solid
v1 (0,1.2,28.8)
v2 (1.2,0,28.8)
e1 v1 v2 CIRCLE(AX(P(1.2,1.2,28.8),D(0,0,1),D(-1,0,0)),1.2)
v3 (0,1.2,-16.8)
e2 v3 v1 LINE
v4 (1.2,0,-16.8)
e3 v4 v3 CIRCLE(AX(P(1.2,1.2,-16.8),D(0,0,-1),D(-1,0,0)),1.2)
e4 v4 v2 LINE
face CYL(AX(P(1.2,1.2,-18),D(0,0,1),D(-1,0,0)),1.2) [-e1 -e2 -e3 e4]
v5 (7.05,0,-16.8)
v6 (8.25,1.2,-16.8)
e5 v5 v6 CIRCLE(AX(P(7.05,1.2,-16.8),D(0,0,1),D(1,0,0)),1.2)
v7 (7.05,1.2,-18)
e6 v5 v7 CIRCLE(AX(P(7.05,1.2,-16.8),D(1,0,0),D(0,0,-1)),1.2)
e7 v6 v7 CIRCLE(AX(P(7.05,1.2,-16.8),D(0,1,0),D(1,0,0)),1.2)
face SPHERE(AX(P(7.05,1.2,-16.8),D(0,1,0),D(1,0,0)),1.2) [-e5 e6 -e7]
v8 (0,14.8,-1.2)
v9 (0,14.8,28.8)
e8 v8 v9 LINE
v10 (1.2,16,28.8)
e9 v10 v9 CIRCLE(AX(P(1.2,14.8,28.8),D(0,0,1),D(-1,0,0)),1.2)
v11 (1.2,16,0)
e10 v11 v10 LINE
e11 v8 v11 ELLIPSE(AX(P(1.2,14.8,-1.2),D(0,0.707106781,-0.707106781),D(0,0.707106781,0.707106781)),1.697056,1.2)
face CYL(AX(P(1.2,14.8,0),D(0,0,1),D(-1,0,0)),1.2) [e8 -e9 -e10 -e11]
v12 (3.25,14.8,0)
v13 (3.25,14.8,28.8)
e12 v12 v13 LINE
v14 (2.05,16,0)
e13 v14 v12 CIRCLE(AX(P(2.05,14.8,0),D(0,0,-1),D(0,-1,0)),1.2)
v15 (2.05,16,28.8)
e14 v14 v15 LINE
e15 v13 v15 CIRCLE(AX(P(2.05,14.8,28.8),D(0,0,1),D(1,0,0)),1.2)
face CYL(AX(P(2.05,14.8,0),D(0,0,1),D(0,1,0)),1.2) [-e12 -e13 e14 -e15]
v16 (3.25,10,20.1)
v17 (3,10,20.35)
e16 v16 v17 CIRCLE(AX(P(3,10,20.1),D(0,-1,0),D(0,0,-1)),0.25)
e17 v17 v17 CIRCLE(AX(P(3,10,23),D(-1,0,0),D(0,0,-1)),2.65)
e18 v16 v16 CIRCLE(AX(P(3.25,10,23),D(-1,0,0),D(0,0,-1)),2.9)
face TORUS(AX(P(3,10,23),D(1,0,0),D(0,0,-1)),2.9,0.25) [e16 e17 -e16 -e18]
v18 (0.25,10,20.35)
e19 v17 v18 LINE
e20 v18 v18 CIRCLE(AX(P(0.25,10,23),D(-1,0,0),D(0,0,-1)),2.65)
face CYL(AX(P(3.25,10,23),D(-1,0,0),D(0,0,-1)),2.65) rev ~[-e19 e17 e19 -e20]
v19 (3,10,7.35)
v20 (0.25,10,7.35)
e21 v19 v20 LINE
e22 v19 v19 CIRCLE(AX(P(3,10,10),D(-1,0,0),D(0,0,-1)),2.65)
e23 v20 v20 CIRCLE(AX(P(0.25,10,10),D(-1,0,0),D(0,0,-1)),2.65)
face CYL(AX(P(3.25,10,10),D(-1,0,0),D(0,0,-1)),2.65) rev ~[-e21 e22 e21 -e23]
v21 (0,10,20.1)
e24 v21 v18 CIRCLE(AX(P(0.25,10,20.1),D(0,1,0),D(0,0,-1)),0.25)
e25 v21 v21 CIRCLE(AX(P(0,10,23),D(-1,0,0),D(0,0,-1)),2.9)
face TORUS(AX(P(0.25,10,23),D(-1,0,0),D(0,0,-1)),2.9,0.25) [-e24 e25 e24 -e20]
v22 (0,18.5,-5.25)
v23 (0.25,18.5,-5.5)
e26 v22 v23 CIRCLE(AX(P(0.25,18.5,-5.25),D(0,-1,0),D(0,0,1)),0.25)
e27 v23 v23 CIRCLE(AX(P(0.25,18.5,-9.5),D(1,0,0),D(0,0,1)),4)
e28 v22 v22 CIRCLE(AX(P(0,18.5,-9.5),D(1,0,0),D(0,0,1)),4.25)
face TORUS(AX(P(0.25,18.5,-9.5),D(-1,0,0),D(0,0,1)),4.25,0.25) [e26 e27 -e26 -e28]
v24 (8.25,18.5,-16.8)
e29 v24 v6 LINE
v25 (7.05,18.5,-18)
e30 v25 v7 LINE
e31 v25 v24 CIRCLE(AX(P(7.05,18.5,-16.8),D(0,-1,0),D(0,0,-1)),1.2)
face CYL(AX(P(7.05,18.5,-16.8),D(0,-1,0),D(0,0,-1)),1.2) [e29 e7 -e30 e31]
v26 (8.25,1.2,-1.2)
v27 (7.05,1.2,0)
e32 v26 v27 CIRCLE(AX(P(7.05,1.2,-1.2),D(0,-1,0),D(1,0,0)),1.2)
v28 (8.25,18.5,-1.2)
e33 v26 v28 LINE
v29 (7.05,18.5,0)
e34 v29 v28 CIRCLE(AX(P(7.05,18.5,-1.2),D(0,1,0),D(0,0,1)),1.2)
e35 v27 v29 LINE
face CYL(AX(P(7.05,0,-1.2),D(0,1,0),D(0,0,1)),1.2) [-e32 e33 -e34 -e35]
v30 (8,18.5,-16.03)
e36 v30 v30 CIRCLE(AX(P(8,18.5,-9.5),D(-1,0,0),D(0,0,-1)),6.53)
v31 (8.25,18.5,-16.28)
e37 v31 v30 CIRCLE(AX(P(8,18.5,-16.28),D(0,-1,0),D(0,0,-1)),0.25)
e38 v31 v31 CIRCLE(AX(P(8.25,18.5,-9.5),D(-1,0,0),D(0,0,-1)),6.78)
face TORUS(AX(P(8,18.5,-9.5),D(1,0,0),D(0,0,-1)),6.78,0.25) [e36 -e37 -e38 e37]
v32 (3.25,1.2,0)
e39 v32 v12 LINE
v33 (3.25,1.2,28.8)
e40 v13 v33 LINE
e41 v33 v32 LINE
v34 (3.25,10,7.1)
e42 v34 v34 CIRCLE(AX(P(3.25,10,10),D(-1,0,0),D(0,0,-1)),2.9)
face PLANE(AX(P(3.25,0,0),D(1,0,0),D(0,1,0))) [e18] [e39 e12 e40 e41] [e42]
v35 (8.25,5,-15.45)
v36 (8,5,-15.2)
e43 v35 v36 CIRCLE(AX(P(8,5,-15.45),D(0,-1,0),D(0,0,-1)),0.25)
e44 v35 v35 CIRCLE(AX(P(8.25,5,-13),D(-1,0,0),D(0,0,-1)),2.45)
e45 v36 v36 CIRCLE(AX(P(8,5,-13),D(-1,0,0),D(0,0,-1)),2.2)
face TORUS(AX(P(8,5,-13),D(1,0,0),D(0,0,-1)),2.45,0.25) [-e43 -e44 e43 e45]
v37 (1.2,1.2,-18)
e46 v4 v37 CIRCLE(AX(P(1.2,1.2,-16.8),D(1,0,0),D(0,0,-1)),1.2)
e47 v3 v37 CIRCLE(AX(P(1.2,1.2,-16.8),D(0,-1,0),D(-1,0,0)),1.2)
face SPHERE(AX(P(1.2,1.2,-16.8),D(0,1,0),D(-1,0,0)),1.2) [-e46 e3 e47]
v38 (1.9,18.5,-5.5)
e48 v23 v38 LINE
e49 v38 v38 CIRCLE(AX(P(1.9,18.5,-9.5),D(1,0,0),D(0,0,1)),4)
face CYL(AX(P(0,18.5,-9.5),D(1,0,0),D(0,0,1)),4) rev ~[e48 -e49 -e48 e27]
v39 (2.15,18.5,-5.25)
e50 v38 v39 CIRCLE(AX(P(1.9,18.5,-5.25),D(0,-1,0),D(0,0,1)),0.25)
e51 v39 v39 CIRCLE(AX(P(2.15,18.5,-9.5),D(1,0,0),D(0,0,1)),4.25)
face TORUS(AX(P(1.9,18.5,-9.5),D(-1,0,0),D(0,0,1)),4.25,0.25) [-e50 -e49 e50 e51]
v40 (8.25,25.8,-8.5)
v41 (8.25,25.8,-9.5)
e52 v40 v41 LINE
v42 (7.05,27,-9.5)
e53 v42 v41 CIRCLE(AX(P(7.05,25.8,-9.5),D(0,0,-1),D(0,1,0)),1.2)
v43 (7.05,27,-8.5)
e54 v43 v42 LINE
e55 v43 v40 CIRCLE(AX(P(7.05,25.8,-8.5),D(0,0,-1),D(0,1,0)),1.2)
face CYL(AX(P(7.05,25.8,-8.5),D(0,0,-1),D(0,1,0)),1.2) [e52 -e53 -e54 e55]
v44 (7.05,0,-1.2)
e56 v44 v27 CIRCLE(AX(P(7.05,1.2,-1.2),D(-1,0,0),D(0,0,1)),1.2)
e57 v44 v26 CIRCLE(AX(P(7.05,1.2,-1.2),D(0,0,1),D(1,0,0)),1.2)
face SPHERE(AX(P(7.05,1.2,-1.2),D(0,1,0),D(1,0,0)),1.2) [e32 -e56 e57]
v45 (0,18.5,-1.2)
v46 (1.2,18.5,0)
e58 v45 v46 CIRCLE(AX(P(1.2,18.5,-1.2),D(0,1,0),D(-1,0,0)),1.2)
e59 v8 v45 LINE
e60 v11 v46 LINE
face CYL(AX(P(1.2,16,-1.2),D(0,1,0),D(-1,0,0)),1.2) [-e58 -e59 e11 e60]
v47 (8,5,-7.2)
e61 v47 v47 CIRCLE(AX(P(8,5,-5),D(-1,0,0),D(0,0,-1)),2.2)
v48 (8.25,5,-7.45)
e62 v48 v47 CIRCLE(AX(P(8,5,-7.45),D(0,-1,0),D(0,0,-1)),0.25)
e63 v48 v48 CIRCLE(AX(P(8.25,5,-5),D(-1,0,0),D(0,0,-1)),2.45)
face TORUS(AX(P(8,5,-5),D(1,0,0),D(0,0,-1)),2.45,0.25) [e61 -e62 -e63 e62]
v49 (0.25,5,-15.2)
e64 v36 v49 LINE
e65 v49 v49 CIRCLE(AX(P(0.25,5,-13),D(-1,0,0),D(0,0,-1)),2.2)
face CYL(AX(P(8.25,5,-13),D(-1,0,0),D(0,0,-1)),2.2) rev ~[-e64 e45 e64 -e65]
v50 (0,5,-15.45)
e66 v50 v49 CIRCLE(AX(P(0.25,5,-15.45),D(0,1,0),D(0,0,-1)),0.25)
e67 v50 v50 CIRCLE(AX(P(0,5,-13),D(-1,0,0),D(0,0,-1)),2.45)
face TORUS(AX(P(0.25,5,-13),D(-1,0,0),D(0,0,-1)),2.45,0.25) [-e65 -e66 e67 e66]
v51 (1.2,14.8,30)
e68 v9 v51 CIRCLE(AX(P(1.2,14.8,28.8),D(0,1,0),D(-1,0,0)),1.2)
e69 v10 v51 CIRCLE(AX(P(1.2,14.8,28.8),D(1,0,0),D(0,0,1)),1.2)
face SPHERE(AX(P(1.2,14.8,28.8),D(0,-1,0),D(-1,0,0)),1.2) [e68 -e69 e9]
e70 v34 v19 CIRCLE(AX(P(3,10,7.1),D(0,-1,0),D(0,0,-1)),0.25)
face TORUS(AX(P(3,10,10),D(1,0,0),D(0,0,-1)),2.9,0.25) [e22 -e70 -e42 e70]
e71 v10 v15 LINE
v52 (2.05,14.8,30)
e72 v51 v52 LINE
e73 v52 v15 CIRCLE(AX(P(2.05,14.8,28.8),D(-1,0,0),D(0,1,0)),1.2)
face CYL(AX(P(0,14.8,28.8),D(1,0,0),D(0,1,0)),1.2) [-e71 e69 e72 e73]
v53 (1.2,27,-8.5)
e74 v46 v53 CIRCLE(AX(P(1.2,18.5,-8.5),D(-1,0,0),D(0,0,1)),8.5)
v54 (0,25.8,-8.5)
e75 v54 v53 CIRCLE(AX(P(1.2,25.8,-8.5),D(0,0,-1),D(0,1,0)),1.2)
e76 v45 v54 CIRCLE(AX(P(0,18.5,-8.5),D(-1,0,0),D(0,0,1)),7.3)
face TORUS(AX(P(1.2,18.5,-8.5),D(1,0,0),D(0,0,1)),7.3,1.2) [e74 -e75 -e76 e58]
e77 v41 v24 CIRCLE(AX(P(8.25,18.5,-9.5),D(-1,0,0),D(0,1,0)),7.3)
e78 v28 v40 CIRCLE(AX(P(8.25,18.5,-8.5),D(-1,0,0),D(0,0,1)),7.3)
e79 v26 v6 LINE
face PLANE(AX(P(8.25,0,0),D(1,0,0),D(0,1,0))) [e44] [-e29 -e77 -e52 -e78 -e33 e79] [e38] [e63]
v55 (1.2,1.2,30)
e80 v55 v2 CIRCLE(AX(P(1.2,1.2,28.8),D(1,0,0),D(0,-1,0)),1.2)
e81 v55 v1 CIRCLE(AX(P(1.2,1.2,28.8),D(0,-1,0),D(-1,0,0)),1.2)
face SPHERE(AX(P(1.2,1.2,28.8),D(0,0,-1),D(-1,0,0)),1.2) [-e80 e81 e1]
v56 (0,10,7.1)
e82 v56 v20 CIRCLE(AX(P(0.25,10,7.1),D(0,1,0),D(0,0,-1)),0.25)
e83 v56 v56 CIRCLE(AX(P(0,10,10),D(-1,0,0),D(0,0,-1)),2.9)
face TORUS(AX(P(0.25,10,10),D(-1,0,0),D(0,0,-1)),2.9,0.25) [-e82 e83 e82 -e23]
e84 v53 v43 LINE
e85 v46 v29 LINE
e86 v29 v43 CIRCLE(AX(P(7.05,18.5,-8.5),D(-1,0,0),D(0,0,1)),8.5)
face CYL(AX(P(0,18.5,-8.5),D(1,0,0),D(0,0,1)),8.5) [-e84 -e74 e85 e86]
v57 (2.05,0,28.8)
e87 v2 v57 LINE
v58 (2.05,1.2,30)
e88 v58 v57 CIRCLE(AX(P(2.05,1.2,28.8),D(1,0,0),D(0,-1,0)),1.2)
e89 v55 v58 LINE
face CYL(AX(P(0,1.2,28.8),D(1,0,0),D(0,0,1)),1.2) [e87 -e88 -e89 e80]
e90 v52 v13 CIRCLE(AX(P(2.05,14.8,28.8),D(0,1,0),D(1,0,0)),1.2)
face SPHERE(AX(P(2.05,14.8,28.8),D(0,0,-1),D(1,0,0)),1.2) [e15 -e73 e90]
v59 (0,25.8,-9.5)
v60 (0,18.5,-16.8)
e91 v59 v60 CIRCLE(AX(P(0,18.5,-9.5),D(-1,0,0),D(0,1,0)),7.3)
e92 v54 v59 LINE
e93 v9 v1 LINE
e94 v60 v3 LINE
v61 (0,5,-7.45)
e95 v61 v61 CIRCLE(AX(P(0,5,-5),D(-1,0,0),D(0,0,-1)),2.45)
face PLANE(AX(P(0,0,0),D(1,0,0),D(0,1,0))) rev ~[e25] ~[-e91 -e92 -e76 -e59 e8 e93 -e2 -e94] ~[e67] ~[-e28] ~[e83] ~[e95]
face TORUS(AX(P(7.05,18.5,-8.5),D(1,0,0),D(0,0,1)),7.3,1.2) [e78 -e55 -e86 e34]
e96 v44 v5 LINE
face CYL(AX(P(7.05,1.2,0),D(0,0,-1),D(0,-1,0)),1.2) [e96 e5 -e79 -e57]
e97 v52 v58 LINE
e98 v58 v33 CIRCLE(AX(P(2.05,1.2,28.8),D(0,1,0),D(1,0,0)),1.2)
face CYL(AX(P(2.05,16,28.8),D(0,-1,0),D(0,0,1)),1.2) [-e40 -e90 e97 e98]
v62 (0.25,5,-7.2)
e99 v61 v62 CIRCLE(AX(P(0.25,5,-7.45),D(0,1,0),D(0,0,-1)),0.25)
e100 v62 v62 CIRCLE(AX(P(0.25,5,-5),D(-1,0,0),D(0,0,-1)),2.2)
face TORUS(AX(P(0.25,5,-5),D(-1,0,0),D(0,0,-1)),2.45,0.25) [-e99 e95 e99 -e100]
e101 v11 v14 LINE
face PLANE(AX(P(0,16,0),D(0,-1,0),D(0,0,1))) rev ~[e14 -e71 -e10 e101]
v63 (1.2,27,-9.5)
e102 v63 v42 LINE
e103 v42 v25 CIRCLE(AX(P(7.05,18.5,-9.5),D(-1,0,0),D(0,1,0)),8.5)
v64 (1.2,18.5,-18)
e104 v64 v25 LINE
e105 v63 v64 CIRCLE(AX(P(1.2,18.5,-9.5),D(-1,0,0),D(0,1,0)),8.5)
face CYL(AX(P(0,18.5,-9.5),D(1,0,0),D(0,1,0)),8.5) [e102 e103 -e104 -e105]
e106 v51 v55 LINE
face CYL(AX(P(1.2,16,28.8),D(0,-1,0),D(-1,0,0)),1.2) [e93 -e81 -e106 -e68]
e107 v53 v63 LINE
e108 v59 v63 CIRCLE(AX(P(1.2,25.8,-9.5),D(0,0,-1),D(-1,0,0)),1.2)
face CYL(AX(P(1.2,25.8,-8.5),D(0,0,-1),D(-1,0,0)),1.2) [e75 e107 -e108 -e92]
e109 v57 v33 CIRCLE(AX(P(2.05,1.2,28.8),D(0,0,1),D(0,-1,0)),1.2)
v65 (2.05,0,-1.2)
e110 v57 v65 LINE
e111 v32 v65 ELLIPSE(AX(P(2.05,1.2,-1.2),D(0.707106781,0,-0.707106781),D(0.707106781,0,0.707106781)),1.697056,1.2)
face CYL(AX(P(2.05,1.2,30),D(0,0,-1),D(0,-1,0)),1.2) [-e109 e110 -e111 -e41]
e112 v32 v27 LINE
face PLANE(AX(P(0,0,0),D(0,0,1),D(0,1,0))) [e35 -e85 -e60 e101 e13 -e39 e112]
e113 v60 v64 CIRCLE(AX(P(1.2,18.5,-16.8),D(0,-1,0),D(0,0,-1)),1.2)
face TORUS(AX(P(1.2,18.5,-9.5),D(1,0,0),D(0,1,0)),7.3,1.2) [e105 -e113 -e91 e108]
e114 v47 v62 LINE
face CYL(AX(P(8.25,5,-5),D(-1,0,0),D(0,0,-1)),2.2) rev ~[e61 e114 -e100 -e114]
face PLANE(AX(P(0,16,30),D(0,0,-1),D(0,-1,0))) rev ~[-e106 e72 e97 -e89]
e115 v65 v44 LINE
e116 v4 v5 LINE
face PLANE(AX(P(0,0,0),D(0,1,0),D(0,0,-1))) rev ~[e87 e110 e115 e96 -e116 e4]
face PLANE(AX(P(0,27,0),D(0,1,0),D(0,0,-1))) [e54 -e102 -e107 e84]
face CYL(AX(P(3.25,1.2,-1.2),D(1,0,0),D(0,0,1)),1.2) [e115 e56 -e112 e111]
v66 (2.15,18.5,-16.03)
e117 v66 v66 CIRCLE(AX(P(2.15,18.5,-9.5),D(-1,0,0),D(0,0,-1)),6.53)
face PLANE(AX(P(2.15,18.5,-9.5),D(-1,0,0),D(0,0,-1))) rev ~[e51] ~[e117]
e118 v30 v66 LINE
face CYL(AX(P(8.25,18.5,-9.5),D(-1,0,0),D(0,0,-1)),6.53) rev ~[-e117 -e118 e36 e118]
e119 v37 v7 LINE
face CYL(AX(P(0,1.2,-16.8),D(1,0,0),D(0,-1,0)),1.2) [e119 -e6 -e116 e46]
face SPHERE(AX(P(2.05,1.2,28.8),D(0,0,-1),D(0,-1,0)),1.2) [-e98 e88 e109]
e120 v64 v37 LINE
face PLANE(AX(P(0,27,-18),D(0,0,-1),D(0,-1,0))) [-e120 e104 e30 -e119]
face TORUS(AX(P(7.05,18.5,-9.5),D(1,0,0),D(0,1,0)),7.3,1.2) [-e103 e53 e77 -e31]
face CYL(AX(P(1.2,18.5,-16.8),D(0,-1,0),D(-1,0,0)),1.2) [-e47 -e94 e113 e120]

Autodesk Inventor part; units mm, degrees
ref_plane "YZ Plane" through (0, 0, 0) normal (1, 0, 0) x (0, 1, 0)
ref_plane "XZ Plane" through (0, 0, 0) normal (0, 1, 0) x (-1, 0, 0)
ref_plane "XY Plane" through (0, 0, 0) normal (0, 0, 1) x (1, 0, 0)
sketch "Sketch1" plane through (0, 0, 0) normal (1, 0, 0) x (0, 1, 0)
  line L0 (27, 0) -> (27, -18)
  line L1 (0, 0) -> (0, -18)
  line L2 (27, -18) -> (0, -18)
  line L3 (0, 0) -> (27, 0)
  dimension "d0" = 18
  dimension "d2" = 27
sketch "Sketch2" plane through (0, 0, 0) normal (1, 0, 0) x (0, 1, 0)
  line L0 (16, 30) -> (0, 30)
  line L1 (0, 30) -> (0, 0)
  line L2 (16, 0) -> (16, 30)
  line L3 (0, 0) -> (16, 0)
  dimension "d3" = 16
  dimension "d4" = 30
extrude "Extrusion1" add sketch "Sketch2" along normal blind 3.25
extrude "Extrusion2" add sketch "Sketch1" along normal blind 8.25
sketch "Sketch4" plane through (3.25, 0, 0) normal (1, 0, 0) x (0, 0, -1)
  line L0 (-30, 16) -> (-30, 0) projected
  line L1 (-30, 0) -> (0, 0) projected
  line L2 (0, 0) -> (0, 16) projected
  point P0 (-23, 10)
  point P1 (-10, 10)
  dimension "d12" = 7
  dimension "d13" = 10
  dimension "d14" = 10
  dimension "d15" = 10
hole "Hole1" at (3.25, 10, 23) at (3.25, 10, 10) direction (-1, 0, 0) diameter 5.3 end through all
sketch "Sketch5" plane through (8.25, 0, 0) normal (1, 0, 0) x (0, 0, -1)
  line L0 (18, 27) -> (0, 27) projected
  line L1 (18, 0) -> (18, 27) projected
  point P0 (9.5, 18.5)
  dimension "d24" = 8.5
  dimension "d45" = 8.5
hole "Hole2" at (8.25, 18.5, -9.5) direction (-1, 0, 0) diameter 13.06 depth 6.1
sketch "Sketch6" plane through (0, 0, 0) normal (-1, 0, 0) x (0, 0, 1)
  line L0 (-18, 27) -> (0, 27) projected
  line L1 (-18, 0) -> (-18, 27) projected
  point P0 (0, 0)
  point P1 (-9.5, 18.5)
  dimension "d33" = 8.5
  dimension "d34" = 8.5
hole "Hole3" at (0, 18.5, -9.5) direction (1, 0, 0) diameter 8 end through all
fillet "Fillet1" radius 8.5 2 edges at (4.125, 27, 0) (4.125, 27, -18)
sketch "Sketch7" plane through (8.25, 0, 0) normal (1, 0, 0) x (0, 0, -1)
  line L0 (0, 18.5) -> (0, 0) projected
  line L1 (0, 0) -> (18, 0) projected
  line L2 (18, 0) -> (18, 18.5) projected
  point P0 (13, 5)
  point P1 (5, 5)
  point P2 (13, 5)
  point P3 (5, 5)
  dimension "d46" = 5
  dimension "d47" = 5
  dimension "d48" = 5
  dimension "d49" = 5
hole "Hole4" at (8.25, 5, -13) at (8.25, 5, -5) direction (-1, 0, 0) diameter 4.4 end through all
fillet "Fillet3" radius 0.25 11 edges at (3.25, 10, 25.65) (3.25, 10, 12.65) (8.25, 18.5, -2.97) (2.15, 18.5, -13.5) (0, 10, 25.65) (0, 10, 12.65) (0, 18.5, -13.5) (8.25, 5, -2.8) (8.25, 5, -10.8) (0, 5, -10.8) (0, 5, -2.8)
fillet "Fillet4" radius 1.2 20 edges at (8.25, 24.5104, -15.5104) (8.25, 27, -9) (8.25, 24.5104, -2.4896) (8.25, 9.25, 0) (8.25, 0, -9) (8.25, 9.25, -18) (0, 24.5104, -15.5104) (0, 9.25, -18) (0, 0, 6) (0, 8, 30) (0, 16, 15) (0, 24.5104, -2.4896) (0, 27, -9) (4.125, 0, -18) (5.75, 0, 0) (3.25, 0, 15) (1.625, 0, 30) (3.25, 16, 15) (3.25, 8, 30) (1.625, 16, 30)
properties part number "13mmBearingBracketRight"
